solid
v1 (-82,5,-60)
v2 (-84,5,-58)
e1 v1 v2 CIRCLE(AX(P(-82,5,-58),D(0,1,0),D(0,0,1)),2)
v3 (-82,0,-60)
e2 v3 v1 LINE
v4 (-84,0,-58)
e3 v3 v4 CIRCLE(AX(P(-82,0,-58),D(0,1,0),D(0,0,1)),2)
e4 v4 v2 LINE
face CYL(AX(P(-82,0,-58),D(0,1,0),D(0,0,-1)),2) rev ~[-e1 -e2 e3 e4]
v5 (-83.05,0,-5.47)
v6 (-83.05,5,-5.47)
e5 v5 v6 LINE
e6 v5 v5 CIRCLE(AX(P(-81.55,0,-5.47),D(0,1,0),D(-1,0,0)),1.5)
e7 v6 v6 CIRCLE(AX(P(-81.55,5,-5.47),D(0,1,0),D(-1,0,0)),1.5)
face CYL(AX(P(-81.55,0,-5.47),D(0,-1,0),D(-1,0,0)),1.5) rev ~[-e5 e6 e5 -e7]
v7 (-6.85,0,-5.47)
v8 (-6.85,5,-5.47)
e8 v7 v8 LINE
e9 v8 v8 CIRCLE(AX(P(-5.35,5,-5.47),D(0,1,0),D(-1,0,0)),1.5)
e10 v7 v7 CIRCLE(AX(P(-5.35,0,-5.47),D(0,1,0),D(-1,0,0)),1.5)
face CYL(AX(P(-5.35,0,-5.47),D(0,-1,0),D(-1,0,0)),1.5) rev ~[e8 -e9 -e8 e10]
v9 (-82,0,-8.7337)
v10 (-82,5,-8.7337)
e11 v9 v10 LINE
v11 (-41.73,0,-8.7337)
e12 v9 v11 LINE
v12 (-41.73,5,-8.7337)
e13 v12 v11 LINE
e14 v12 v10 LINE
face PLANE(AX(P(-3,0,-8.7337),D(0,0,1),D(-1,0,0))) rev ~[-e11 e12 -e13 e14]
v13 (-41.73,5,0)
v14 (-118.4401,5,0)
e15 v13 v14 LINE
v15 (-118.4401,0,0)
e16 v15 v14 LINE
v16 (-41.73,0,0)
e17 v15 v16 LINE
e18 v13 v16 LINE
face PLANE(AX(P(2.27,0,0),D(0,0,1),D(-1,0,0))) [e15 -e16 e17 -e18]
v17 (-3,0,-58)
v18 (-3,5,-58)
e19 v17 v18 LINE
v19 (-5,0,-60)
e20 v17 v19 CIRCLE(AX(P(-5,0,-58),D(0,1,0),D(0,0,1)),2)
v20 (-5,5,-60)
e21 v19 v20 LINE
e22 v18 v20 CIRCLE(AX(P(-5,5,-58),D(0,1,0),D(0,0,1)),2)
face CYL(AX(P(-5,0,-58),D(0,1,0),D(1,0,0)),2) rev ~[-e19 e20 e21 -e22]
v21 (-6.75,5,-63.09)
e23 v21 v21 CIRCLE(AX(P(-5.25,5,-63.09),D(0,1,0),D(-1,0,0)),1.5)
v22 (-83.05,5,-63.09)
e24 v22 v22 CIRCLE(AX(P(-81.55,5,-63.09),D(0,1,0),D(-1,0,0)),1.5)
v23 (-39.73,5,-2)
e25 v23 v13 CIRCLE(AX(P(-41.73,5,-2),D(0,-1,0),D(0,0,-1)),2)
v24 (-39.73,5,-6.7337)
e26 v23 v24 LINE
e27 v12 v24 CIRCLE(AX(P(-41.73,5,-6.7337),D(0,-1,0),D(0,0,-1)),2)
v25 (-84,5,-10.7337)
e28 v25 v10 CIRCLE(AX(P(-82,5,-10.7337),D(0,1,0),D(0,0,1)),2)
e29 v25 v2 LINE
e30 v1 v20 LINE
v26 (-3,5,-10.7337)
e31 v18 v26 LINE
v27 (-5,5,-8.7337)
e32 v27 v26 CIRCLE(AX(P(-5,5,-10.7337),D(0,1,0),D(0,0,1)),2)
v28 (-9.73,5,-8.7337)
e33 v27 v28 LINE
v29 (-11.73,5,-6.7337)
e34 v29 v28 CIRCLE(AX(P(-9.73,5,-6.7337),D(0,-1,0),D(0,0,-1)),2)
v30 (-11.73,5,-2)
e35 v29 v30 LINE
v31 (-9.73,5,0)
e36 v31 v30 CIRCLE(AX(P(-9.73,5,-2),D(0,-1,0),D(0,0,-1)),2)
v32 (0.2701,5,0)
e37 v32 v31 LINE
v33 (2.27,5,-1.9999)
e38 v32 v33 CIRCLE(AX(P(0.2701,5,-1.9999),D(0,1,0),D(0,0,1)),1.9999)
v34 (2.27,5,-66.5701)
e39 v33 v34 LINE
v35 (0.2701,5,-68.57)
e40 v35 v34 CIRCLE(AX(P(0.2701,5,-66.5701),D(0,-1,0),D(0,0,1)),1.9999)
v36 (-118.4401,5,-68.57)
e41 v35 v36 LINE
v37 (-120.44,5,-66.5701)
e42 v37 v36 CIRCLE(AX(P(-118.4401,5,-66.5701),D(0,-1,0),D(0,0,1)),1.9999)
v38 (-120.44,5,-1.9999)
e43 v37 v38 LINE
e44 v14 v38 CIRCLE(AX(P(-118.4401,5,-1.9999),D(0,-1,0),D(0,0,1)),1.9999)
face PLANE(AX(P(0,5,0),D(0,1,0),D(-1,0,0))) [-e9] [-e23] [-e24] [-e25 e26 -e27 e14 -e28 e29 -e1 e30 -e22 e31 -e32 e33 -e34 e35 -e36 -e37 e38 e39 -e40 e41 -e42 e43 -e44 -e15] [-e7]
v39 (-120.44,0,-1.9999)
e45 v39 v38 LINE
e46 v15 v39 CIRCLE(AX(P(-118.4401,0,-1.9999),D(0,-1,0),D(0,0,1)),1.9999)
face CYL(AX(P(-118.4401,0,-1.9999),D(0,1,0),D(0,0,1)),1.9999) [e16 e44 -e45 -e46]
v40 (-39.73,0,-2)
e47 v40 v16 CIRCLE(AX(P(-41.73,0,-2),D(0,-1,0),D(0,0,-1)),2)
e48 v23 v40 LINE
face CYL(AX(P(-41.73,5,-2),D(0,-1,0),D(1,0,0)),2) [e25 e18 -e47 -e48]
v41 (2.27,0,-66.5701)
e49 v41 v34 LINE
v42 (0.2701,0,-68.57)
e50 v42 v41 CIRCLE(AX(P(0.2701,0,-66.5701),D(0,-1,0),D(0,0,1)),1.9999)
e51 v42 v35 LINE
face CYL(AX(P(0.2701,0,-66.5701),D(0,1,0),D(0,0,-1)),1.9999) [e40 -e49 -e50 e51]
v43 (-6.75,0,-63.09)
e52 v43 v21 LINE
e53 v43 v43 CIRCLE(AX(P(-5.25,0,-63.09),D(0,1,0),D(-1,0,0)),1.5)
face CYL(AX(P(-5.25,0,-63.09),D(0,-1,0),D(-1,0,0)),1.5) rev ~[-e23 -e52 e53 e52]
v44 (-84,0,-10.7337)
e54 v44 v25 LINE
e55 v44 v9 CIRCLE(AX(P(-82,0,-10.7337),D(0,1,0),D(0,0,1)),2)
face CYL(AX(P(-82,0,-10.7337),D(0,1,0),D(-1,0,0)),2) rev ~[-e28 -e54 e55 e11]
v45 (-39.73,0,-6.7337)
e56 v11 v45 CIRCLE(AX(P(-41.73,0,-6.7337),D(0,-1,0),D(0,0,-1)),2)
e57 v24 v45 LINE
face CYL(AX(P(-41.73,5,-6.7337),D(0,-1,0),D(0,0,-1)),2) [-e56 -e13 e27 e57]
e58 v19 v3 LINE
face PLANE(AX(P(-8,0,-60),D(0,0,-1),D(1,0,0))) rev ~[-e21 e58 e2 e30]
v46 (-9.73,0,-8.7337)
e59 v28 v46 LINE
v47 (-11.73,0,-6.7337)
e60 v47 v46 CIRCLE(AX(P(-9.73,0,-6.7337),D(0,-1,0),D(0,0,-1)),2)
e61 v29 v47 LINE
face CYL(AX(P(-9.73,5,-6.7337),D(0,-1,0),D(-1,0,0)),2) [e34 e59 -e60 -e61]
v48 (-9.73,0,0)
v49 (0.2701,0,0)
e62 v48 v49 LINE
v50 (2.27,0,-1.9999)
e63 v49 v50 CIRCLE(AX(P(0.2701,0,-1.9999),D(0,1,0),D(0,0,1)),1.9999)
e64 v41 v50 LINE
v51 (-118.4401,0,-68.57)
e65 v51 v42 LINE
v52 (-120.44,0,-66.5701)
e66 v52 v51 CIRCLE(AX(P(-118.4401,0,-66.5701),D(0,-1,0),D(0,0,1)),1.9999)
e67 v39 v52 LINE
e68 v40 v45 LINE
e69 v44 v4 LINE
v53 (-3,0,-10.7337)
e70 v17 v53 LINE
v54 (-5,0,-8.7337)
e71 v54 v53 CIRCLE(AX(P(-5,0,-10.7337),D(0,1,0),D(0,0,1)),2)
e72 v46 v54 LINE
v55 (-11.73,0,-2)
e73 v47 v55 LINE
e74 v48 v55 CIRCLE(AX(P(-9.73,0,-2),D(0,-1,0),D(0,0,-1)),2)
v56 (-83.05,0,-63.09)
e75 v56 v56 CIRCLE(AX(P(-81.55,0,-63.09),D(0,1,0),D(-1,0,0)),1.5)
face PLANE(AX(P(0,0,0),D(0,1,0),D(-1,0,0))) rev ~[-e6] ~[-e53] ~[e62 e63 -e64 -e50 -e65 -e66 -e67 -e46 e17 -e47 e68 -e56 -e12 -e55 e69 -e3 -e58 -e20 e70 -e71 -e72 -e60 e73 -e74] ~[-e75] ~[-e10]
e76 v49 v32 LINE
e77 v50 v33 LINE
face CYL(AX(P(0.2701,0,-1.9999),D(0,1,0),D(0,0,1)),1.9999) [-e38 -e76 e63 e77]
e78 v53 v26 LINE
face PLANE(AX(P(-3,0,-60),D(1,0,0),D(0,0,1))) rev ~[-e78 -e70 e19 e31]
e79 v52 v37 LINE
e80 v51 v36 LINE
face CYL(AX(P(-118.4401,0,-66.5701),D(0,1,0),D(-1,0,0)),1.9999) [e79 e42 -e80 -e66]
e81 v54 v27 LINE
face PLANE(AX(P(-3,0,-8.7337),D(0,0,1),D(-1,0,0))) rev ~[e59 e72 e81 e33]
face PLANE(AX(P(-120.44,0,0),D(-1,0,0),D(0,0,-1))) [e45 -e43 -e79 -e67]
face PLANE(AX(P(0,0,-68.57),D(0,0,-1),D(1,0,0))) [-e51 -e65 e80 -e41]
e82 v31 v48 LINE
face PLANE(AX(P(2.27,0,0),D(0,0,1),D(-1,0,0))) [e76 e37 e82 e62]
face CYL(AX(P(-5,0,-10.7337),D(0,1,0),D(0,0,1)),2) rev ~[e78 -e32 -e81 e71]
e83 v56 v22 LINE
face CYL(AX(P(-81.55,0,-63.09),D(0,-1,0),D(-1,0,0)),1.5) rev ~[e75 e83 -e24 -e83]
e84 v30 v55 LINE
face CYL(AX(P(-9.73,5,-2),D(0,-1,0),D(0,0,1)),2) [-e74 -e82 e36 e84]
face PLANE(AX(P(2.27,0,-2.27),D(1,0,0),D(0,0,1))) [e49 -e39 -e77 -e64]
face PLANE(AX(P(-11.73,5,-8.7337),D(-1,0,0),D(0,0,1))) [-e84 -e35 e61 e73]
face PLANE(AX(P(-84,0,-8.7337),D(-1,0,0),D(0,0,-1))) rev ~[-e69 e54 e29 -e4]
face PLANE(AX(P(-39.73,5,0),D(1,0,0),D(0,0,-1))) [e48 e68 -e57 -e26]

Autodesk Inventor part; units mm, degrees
ref_plane "YZ Plane" through (0, 0, 0) normal (1, 0, 0) x (0, 1, 0)
ref_plane "XZ Plane" through (0, 0, 0) normal (0, 1, 0) x (-1, 0, 0)
ref_plane "XY Plane" through (0, 0, 0) normal (0, 0, 1) x (1, 0, 0)
sketch "Sketch1" plane through (0, 0, 0) normal (0, 1, 0) x (-1, 0, 0)
  line L0 (-2.27, 0) -> (120.44, 0)
  line L1 (120.44, 0) -> (120.44, -68.57)
  line L2 (120.44, -68.57) -> (-2.27, -68.57)
  line L3 (-2.27, -68.57) -> (-2.27, 0)
  line L4 (120.44, -66.57) -> (120.44, -2)
  line L5 (0, -68.57) -> (118.44, -68.57)
  line L6 (-2.27, -2.27) -> (-2.27, -66.3)
  circle A0 centre (81.55, -63.09) radius 1.5
  circle A1 centre (81.55, -63.09) radius 1.5
  line L7 (70.44, -68.57) -> (15.73, -68.57)
  line L8 (51, 0) -> (75, 0)
  line L9 (26, 0) -> (51, 0)
  line L10 (84, -60) -> (79, -60)
  line L11 (79, -60) -> (79, -8.7337)
  line L12 (79, -8.7337) -> (84, -8.7337)
  line L13 (84, -8.7337) -> (84, -60)
  line L14 (8, -60) -> (3, -60)
  line L15 (3, -60) -> (3, -8.7337)
  line L16 (3, -8.7337) -> (8, -8.7337)
  line L17 (8, -8.7337) -> (8, -60)
  circle A2 centre (5.25, -63.09) radius 1.5
  circle A3 centre (5.35, -5.47) radius 1.5
  circle A4 centre (81.55, -5.47) radius 1.5
  circle A5 centre (81.55, -5.47) radius 1.5
  circle A6 centre (5.35, -5.47) radius 1.5
  circle A7 centre (5.25, -63.09) radius 1.5
  dimension "d20" = 3
  dimension "d27" = 3
  dimension "d28" = 3
  dimension "d29" = 3
  dimension "d30" = 68.57
extrude "Extrusion1" add sketch "Sketch1" along normal blind 5
fillet "Fillet4" radius 2 4 edges at (-120.44, 2.5, -68.57) (-120.44, 2.5, 0) (2.27, 2.5, -68.57) (2.27, 2.5, 0)
sketch "Sketch7" plane through (0, 5, 0) normal (0, 1, 0) x (1, 0, 0)
  line L0 (-117.44, 63.57) -> (-87.44, 63.57)
  line L1 (-87.44, 63.57) -> (-87.44, 5)
  line L2 (-87.44, 5) -> (-117.44, 5)
  line L3 (-117.44, 5) -> (-117.44, 63.57)
  line L4 (-120.44, 66.57) -> (-120.44, 2) projected
  line L5 (0.27, 68.57) -> (-118.44, 68.57) projected
  line L6 (-118.44, 0) -> (0.27, 0) projected
  point P0 (0, 0)
  dimension "d67" = 30
  dimension "d68" = 3
  dimension "d69" = 5
  dimension "d70" = 5
extrude "Extrusion6" [suppressed]
fillet "Fillet8" [suppressed]
sketch "Sketch8" plane through (0, 5, 0) normal (0, 1, 0) x (1, 0, 0)
  line L0 (-79, 60) -> (-8, 60)
  line L1 (-8, 60) -> (-8, 8.7337)
  line L2 (-8, 8.7337) -> (-79, 8.7337)
  line L3 (-79, 8.7337) -> (-79, 60)
  line L4 (-8, 8.7337) -> (-8, 60) projected
  line L5 (0.27, 68.57) -> (-118.44, 68.57) projected
  line L6 (-79, 60) -> (-79, 8.7337) projected
  line L7 (-3, 8.7337) -> (-8, 8.7337) projected
  line L8 (-8, 60) -> (-3, 60) projected
  point P0 (0, 0)
extrude "Extrusion7" cut sketch "Sketch8" against normal blind 10
sketch "Sketch9" plane through (0, 5, 0) normal (0, 1, 0) x (1, 0, 0)
  line L0 (-3, 8.7337) -> (-84, 8.7337) projected
  line L1 (-118.44, 0) -> (0.27, 0) projected
  line L2 (-39.73, 8.7337) -> (-11.73, 8.7337)
  line L3 (-11.73, 8.7337) -> (-11.73, 0)
  line L4 (-11.73, 0) -> (-39.73, 0)
  line L5 (-39.73, 0) -> (-39.73, 8.7337)
  line L6 (2.27, 2) -> (2.27, 66.57) projected
  point P0 (0, 0)
  point P1 (-79, 8.57)
  point P2 (-8, 8.57)
  point P3 (-39.73, 0)
  point P4 (-11.73, 8.57)
  point P5 (-11.73, 8.7337)
  point P6 (-79, 8.871)
  point P7 (-8, 8.871)
  point P8 (-11.73, 8.871)
  point P9 (-11.73, 8.7337)
  dimension "d78" = 28
  dimension "d81" = 14
  dimension "d82" = 8.7338
extrude "Extrusion8" cut sketch "Sketch9" against normal blind 5
fillet "Fillet9" radius 2 8 edges at (-84, 2.5, -60) (-3, 2.5, -60) (-3, 2.5, -8.7337) (-11.73, 2.5, -8.7337) (-11.73, 2.5, 0) (-39.73, 2.5, -8.7337) (-39.73, 2.5, 0) (-84, 2.5, -8.7337)
properties part number "Top PMMA"
